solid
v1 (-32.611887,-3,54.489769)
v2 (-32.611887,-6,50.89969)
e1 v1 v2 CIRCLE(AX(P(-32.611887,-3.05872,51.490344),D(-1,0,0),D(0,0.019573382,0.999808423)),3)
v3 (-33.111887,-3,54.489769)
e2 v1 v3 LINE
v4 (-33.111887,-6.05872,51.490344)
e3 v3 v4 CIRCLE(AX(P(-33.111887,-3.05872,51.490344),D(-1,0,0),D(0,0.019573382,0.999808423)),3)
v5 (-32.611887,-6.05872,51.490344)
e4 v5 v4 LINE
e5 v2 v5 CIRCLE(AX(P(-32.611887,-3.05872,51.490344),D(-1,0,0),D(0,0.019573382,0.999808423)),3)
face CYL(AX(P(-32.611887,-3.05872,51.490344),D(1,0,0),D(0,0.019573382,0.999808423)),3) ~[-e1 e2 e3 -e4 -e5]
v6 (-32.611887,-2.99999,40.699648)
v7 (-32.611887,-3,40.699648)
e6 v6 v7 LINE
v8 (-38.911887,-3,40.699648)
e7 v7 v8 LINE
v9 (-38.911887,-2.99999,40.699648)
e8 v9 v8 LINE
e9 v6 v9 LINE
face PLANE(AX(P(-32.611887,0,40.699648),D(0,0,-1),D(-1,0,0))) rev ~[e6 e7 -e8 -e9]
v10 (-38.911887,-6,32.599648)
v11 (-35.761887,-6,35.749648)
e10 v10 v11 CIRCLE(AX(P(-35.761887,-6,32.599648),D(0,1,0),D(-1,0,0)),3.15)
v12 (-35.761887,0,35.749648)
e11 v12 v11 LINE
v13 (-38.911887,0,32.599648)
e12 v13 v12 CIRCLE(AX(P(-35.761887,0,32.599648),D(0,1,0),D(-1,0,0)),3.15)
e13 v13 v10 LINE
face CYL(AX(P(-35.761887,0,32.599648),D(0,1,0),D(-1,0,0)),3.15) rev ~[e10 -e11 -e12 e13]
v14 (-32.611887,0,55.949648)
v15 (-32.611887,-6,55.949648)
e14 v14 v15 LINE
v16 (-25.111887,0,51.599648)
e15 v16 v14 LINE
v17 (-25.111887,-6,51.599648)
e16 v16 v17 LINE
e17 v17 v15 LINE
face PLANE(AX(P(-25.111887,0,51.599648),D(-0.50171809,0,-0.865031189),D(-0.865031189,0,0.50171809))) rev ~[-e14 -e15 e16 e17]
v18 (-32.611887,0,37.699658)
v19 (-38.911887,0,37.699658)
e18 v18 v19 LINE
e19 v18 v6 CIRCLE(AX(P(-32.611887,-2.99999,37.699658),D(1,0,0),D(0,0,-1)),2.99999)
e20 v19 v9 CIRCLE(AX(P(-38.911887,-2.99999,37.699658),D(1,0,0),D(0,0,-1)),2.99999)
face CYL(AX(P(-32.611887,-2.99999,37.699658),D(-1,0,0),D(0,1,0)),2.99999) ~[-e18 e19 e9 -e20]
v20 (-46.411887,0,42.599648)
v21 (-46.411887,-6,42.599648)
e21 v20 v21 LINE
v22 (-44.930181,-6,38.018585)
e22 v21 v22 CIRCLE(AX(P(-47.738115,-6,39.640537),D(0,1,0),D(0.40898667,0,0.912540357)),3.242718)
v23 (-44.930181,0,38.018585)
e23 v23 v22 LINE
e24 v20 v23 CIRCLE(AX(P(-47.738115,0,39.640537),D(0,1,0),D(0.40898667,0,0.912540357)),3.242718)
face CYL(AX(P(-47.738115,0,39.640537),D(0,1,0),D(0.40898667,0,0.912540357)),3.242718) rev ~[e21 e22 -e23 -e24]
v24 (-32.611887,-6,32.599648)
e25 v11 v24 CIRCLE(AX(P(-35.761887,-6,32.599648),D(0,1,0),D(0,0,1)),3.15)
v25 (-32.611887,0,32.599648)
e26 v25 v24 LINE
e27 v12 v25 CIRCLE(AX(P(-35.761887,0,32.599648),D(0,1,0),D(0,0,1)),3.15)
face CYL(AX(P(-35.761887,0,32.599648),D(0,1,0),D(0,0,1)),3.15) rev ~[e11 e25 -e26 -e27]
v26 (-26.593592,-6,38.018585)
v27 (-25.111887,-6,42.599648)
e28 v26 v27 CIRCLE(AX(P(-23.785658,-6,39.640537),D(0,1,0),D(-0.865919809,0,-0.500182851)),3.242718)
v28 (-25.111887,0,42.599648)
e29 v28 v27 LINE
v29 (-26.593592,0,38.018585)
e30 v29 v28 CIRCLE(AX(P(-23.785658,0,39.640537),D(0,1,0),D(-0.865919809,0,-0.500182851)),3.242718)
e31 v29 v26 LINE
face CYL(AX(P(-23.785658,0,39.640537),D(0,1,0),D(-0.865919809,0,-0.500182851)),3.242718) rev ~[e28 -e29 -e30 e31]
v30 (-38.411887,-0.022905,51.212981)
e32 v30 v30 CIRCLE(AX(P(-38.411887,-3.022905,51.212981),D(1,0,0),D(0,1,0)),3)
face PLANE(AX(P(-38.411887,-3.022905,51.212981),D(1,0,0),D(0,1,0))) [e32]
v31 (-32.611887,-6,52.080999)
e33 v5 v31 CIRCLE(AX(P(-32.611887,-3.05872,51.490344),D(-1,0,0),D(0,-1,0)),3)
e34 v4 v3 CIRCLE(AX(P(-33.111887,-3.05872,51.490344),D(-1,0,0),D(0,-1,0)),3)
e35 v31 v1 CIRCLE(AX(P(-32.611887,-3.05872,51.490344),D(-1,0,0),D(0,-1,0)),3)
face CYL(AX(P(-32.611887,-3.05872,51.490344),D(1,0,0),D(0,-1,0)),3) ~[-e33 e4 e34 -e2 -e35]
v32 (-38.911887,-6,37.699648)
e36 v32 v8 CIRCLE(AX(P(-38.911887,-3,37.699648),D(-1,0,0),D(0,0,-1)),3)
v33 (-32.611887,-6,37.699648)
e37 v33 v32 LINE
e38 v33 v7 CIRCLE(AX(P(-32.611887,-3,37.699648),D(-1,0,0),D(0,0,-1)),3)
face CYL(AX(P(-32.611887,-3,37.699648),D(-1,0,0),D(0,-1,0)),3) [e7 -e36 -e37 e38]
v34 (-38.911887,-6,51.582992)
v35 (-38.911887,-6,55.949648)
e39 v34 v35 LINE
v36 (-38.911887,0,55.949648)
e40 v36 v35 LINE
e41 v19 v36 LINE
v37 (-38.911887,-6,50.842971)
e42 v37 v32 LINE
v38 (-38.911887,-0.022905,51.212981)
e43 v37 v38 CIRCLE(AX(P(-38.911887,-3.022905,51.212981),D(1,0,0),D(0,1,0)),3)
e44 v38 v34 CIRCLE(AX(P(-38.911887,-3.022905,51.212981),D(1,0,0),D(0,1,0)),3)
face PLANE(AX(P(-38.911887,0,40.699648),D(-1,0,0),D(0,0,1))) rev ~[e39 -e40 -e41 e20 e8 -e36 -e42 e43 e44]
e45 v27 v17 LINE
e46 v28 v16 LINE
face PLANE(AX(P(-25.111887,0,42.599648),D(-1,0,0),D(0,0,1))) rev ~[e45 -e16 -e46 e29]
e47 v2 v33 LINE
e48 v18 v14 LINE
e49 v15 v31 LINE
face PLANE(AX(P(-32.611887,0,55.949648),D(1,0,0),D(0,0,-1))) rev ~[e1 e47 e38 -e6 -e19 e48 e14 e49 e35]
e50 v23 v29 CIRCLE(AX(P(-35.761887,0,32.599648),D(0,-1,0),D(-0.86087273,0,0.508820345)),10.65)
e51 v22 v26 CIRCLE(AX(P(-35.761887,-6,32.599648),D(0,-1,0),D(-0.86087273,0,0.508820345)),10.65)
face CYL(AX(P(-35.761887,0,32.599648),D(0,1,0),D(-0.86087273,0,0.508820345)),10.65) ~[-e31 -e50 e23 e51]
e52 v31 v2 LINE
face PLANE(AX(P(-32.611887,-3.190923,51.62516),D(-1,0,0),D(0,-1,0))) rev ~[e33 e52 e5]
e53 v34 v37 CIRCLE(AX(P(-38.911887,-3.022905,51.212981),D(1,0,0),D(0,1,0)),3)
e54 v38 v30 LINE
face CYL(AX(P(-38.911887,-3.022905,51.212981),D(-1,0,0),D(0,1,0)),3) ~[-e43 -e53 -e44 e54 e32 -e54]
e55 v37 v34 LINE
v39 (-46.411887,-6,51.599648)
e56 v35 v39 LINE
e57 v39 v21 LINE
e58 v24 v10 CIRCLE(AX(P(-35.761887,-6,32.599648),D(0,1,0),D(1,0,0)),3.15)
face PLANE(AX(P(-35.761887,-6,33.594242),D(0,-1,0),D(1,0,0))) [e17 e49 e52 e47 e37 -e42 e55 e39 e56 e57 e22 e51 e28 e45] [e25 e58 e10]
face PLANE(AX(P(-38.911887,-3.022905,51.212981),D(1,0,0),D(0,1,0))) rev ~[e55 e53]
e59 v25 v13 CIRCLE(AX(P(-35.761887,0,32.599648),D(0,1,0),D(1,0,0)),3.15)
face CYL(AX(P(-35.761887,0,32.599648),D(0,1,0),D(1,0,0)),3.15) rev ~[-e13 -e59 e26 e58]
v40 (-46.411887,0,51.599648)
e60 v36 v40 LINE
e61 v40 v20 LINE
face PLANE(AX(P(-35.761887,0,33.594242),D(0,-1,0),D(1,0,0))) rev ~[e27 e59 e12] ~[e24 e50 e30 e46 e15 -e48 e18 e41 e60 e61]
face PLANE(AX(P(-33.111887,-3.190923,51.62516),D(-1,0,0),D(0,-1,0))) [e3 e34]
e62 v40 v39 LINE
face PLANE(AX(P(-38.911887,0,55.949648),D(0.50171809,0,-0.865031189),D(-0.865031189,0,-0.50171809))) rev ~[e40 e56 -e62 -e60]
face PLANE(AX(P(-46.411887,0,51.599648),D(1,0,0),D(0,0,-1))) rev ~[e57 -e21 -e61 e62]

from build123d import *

# Parameters (mm, degrees)
F1_DEPTH = 6
F3_DEPTH = 0.5
F4_R     = 3
F5_DEPTH = 0.5
F6_DEPTH = 6
F7_R     = 3
F8_R     = 2.99999


# Not quite as in the source:
# - a fillet or chamfer is up to 0.001 mm smaller than in the source, because OpenCascade refuses the exact size


with BuildPart() as f1:
    # F0 (on Front) → F1 (new body)
    with BuildSketch(Plane.XZ):
        with BuildLine():
            Line((-38.9118868113, 40.6996482372), (-38.9118868113, 42.7731432119))
            ThreePointArc((-38.9118868113, 42.7731432119), (-42.3638979782, 40.9564388024), (-44.9301813825, 38.0185849093))
            ThreePointArc((-44.9301813825, 38.0185849093), (-35.7618868113, 21.9496482372), (-26.59359224, 38.0185849093))
            ThreePointArc((-26.59359224, 38.0185849093), (-29.1598756443, 40.9564388024), (-32.6118868113, 42.7731432119))
            Line((-32.6118868113, 42.7731432119), (-32.6118868113, 40.6996482372))
            Line((-32.6118868113, 40.6996482372), (-35.7618868113, 40.6996482372))
            Line((-35.7618868113, 40.6996482372), (-38.9118868113, 40.6996482372))
        make_face()
        with BuildLine():
            ThreePointArc((-35.7618868113, 35.7496482372), (-33.5345004505, 34.827034598), (-32.6118868113, 32.5996482372))
            ThreePointArc((-32.6118868113, 32.5996482372), (-35.7618868113, 29.4496482372), (-38.9118868113, 32.5996482372))
            ThreePointArc((-38.9118868113, 32.5996482372), (-37.989273172, 34.827034598), (-35.7618868113, 35.7496482372))
        make_face(mode=Mode.SUBTRACT)
        with BuildLine():
            ThreePointArc((-44.9301813825, 38.0185849093), (-42.3638979782, 40.9564388024), (-38.9118868113, 42.7731432119))
            Line((-38.9118868113, 42.7731432119), (-38.9118868113, 55.9496482372))
            Line((-38.9118868113, 55.9496482372), (-46.4118868113, 51.5996482372))
            Line((-46.4118868113, 51.5996482372), (-46.4118868113, 42.5996482372))
            ThreePointArc((-46.4118868113, 42.5996482372), (-44.652769306, 40.6384655389), (-44.9301813825, 38.0185849093))
        make_face()
        with BuildLine():
            ThreePointArc((-32.6118868113, 42.7731432119), (-29.1598756443, 40.9564388024), (-26.59359224, 38.0185849093))
            ThreePointArc((-26.59359224, 38.0185849093), (-26.8710043165, 40.6384655389), (-25.1118868113, 42.5996482372))
            Line((-25.1118868113, 42.5996482372), (-25.1118868113, 51.5996482372))
            Line((-25.1118868113, 51.5996482372), (-32.6118868113, 55.9496482372))
            Line((-32.6118868113, 55.9496482372), (-32.6118868113, 42.7731432119))
        make_face()
    extrude(amount=F1_DEPTH)

    # F2 (on face) → F3 (join)
    with BuildSketch(Plane(origin=(-32.6118868113, 0, 0), x_dir=(0, -1, 0), z_dir=(-1, 0, 0))):
        with BuildLine():
            ThreePointArc((3, 54.4897693761), (0.9582631067, 49.3483636635), (6.0587201472, 51.4903441072))
            ThreePointArc((6.0587201472, 51.4903441072), (5.1591771878, 53.6323245508), (3, 54.4897693761))
        make_face()
    extrude(amount=F3_DEPTH)

    # F4 (on face) → F5 (join)
    with BuildSketch(Plane.YZ.offset(-38.9118868113)):
        with Locations((-3.0229054391, 51.2129813433)):
            Circle(F4_R)
    extrude(amount=F5_DEPTH)

    # F0 (on Front) → F6 (join)
    with BuildSketch(Plane.XZ):
        with BuildLine():
            Line((-38.9118868113, 40.6996482372), (-38.9118868113, 42.7731432119))
            ThreePointArc((-38.9118868113, 42.7731432119), (-42.3638979782, 40.9564388024), (-44.9301813825, 38.0185849093))
            ThreePointArc((-44.9301813825, 38.0185849093), (-35.7618868113, 21.9496482372), (-26.59359224, 38.0185849093))
            ThreePointArc((-26.59359224, 38.0185849093), (-29.1598756443, 40.9564388024), (-32.6118868113, 42.7731432119))
            Line((-32.6118868113, 42.7731432119), (-32.6118868113, 40.6996482372))
            Line((-32.6118868113, 40.6996482372), (-35.7618868113, 40.6996482372))
            Line((-35.7618868113, 40.6996482372), (-38.9118868113, 40.6996482372))
        make_face()
        with BuildLine():
            ThreePointArc((-35.7618868113, 35.7496482372), (-33.5345004505, 34.827034598), (-32.6118868113, 32.5996482372))
            ThreePointArc((-32.6118868113, 32.5996482372), (-35.7618868113, 29.4496482372), (-38.9118868113, 32.5996482372))
            ThreePointArc((-38.9118868113, 32.5996482372), (-37.989273172, 34.827034598), (-35.7618868113, 35.7496482372))
        make_face(mode=Mode.SUBTRACT)
        with BuildLine():
            ThreePointArc((-44.9301813825, 38.0185849093), (-42.3638979782, 40.9564388024), (-38.9118868113, 42.7731432119))
            Line((-38.9118868113, 42.7731432119), (-38.9118868113, 55.9496482372))
            Line((-38.9118868113, 55.9496482372), (-46.4118868113, 51.5996482372))
            Line((-46.4118868113, 51.5996482372), (-46.4118868113, 42.5996482372))
            ThreePointArc((-46.4118868113, 42.5996482372), (-44.652769306, 40.6384655389), (-44.9301813825, 38.0185849093))
        make_face()
        with BuildLine():
            ThreePointArc((-32.6118868113, 42.7731432119), (-29.1598756443, 40.9564388024), (-26.59359224, 38.0185849093))
            ThreePointArc((-26.59359224, 38.0185849093), (-26.8710043165, 40.6384655389), (-25.1118868113, 42.5996482372))
            Line((-25.1118868113, 42.5996482372), (-25.1118868113, 51.5996482372))
            Line((-25.1118868113, 51.5996482372), (-32.6118868113, 55.9496482372))
            Line((-32.6118868113, 55.9496482372), (-32.6118868113, 42.7731432119))
        make_face()
    extrude(amount=F6_DEPTH)

    # F7
    f7_edges = [f1.edges().sort_by_distance(p)[0] for p in [
        (-35.761887, -6, 40.699648),
    ]]
    fillet(f7_edges, radius=F7_R)

    # F8 (radius 3 in the source; OpenCascade refuses exactly that, so slightly less here)
    f8_edges = [f1.edges().sort_by_distance(p)[0] for p in [
        (-35.761887, 0, 40.699648),
    ]]
    fillet(f8_edges, radius=F8_R)


solid = f1.part
